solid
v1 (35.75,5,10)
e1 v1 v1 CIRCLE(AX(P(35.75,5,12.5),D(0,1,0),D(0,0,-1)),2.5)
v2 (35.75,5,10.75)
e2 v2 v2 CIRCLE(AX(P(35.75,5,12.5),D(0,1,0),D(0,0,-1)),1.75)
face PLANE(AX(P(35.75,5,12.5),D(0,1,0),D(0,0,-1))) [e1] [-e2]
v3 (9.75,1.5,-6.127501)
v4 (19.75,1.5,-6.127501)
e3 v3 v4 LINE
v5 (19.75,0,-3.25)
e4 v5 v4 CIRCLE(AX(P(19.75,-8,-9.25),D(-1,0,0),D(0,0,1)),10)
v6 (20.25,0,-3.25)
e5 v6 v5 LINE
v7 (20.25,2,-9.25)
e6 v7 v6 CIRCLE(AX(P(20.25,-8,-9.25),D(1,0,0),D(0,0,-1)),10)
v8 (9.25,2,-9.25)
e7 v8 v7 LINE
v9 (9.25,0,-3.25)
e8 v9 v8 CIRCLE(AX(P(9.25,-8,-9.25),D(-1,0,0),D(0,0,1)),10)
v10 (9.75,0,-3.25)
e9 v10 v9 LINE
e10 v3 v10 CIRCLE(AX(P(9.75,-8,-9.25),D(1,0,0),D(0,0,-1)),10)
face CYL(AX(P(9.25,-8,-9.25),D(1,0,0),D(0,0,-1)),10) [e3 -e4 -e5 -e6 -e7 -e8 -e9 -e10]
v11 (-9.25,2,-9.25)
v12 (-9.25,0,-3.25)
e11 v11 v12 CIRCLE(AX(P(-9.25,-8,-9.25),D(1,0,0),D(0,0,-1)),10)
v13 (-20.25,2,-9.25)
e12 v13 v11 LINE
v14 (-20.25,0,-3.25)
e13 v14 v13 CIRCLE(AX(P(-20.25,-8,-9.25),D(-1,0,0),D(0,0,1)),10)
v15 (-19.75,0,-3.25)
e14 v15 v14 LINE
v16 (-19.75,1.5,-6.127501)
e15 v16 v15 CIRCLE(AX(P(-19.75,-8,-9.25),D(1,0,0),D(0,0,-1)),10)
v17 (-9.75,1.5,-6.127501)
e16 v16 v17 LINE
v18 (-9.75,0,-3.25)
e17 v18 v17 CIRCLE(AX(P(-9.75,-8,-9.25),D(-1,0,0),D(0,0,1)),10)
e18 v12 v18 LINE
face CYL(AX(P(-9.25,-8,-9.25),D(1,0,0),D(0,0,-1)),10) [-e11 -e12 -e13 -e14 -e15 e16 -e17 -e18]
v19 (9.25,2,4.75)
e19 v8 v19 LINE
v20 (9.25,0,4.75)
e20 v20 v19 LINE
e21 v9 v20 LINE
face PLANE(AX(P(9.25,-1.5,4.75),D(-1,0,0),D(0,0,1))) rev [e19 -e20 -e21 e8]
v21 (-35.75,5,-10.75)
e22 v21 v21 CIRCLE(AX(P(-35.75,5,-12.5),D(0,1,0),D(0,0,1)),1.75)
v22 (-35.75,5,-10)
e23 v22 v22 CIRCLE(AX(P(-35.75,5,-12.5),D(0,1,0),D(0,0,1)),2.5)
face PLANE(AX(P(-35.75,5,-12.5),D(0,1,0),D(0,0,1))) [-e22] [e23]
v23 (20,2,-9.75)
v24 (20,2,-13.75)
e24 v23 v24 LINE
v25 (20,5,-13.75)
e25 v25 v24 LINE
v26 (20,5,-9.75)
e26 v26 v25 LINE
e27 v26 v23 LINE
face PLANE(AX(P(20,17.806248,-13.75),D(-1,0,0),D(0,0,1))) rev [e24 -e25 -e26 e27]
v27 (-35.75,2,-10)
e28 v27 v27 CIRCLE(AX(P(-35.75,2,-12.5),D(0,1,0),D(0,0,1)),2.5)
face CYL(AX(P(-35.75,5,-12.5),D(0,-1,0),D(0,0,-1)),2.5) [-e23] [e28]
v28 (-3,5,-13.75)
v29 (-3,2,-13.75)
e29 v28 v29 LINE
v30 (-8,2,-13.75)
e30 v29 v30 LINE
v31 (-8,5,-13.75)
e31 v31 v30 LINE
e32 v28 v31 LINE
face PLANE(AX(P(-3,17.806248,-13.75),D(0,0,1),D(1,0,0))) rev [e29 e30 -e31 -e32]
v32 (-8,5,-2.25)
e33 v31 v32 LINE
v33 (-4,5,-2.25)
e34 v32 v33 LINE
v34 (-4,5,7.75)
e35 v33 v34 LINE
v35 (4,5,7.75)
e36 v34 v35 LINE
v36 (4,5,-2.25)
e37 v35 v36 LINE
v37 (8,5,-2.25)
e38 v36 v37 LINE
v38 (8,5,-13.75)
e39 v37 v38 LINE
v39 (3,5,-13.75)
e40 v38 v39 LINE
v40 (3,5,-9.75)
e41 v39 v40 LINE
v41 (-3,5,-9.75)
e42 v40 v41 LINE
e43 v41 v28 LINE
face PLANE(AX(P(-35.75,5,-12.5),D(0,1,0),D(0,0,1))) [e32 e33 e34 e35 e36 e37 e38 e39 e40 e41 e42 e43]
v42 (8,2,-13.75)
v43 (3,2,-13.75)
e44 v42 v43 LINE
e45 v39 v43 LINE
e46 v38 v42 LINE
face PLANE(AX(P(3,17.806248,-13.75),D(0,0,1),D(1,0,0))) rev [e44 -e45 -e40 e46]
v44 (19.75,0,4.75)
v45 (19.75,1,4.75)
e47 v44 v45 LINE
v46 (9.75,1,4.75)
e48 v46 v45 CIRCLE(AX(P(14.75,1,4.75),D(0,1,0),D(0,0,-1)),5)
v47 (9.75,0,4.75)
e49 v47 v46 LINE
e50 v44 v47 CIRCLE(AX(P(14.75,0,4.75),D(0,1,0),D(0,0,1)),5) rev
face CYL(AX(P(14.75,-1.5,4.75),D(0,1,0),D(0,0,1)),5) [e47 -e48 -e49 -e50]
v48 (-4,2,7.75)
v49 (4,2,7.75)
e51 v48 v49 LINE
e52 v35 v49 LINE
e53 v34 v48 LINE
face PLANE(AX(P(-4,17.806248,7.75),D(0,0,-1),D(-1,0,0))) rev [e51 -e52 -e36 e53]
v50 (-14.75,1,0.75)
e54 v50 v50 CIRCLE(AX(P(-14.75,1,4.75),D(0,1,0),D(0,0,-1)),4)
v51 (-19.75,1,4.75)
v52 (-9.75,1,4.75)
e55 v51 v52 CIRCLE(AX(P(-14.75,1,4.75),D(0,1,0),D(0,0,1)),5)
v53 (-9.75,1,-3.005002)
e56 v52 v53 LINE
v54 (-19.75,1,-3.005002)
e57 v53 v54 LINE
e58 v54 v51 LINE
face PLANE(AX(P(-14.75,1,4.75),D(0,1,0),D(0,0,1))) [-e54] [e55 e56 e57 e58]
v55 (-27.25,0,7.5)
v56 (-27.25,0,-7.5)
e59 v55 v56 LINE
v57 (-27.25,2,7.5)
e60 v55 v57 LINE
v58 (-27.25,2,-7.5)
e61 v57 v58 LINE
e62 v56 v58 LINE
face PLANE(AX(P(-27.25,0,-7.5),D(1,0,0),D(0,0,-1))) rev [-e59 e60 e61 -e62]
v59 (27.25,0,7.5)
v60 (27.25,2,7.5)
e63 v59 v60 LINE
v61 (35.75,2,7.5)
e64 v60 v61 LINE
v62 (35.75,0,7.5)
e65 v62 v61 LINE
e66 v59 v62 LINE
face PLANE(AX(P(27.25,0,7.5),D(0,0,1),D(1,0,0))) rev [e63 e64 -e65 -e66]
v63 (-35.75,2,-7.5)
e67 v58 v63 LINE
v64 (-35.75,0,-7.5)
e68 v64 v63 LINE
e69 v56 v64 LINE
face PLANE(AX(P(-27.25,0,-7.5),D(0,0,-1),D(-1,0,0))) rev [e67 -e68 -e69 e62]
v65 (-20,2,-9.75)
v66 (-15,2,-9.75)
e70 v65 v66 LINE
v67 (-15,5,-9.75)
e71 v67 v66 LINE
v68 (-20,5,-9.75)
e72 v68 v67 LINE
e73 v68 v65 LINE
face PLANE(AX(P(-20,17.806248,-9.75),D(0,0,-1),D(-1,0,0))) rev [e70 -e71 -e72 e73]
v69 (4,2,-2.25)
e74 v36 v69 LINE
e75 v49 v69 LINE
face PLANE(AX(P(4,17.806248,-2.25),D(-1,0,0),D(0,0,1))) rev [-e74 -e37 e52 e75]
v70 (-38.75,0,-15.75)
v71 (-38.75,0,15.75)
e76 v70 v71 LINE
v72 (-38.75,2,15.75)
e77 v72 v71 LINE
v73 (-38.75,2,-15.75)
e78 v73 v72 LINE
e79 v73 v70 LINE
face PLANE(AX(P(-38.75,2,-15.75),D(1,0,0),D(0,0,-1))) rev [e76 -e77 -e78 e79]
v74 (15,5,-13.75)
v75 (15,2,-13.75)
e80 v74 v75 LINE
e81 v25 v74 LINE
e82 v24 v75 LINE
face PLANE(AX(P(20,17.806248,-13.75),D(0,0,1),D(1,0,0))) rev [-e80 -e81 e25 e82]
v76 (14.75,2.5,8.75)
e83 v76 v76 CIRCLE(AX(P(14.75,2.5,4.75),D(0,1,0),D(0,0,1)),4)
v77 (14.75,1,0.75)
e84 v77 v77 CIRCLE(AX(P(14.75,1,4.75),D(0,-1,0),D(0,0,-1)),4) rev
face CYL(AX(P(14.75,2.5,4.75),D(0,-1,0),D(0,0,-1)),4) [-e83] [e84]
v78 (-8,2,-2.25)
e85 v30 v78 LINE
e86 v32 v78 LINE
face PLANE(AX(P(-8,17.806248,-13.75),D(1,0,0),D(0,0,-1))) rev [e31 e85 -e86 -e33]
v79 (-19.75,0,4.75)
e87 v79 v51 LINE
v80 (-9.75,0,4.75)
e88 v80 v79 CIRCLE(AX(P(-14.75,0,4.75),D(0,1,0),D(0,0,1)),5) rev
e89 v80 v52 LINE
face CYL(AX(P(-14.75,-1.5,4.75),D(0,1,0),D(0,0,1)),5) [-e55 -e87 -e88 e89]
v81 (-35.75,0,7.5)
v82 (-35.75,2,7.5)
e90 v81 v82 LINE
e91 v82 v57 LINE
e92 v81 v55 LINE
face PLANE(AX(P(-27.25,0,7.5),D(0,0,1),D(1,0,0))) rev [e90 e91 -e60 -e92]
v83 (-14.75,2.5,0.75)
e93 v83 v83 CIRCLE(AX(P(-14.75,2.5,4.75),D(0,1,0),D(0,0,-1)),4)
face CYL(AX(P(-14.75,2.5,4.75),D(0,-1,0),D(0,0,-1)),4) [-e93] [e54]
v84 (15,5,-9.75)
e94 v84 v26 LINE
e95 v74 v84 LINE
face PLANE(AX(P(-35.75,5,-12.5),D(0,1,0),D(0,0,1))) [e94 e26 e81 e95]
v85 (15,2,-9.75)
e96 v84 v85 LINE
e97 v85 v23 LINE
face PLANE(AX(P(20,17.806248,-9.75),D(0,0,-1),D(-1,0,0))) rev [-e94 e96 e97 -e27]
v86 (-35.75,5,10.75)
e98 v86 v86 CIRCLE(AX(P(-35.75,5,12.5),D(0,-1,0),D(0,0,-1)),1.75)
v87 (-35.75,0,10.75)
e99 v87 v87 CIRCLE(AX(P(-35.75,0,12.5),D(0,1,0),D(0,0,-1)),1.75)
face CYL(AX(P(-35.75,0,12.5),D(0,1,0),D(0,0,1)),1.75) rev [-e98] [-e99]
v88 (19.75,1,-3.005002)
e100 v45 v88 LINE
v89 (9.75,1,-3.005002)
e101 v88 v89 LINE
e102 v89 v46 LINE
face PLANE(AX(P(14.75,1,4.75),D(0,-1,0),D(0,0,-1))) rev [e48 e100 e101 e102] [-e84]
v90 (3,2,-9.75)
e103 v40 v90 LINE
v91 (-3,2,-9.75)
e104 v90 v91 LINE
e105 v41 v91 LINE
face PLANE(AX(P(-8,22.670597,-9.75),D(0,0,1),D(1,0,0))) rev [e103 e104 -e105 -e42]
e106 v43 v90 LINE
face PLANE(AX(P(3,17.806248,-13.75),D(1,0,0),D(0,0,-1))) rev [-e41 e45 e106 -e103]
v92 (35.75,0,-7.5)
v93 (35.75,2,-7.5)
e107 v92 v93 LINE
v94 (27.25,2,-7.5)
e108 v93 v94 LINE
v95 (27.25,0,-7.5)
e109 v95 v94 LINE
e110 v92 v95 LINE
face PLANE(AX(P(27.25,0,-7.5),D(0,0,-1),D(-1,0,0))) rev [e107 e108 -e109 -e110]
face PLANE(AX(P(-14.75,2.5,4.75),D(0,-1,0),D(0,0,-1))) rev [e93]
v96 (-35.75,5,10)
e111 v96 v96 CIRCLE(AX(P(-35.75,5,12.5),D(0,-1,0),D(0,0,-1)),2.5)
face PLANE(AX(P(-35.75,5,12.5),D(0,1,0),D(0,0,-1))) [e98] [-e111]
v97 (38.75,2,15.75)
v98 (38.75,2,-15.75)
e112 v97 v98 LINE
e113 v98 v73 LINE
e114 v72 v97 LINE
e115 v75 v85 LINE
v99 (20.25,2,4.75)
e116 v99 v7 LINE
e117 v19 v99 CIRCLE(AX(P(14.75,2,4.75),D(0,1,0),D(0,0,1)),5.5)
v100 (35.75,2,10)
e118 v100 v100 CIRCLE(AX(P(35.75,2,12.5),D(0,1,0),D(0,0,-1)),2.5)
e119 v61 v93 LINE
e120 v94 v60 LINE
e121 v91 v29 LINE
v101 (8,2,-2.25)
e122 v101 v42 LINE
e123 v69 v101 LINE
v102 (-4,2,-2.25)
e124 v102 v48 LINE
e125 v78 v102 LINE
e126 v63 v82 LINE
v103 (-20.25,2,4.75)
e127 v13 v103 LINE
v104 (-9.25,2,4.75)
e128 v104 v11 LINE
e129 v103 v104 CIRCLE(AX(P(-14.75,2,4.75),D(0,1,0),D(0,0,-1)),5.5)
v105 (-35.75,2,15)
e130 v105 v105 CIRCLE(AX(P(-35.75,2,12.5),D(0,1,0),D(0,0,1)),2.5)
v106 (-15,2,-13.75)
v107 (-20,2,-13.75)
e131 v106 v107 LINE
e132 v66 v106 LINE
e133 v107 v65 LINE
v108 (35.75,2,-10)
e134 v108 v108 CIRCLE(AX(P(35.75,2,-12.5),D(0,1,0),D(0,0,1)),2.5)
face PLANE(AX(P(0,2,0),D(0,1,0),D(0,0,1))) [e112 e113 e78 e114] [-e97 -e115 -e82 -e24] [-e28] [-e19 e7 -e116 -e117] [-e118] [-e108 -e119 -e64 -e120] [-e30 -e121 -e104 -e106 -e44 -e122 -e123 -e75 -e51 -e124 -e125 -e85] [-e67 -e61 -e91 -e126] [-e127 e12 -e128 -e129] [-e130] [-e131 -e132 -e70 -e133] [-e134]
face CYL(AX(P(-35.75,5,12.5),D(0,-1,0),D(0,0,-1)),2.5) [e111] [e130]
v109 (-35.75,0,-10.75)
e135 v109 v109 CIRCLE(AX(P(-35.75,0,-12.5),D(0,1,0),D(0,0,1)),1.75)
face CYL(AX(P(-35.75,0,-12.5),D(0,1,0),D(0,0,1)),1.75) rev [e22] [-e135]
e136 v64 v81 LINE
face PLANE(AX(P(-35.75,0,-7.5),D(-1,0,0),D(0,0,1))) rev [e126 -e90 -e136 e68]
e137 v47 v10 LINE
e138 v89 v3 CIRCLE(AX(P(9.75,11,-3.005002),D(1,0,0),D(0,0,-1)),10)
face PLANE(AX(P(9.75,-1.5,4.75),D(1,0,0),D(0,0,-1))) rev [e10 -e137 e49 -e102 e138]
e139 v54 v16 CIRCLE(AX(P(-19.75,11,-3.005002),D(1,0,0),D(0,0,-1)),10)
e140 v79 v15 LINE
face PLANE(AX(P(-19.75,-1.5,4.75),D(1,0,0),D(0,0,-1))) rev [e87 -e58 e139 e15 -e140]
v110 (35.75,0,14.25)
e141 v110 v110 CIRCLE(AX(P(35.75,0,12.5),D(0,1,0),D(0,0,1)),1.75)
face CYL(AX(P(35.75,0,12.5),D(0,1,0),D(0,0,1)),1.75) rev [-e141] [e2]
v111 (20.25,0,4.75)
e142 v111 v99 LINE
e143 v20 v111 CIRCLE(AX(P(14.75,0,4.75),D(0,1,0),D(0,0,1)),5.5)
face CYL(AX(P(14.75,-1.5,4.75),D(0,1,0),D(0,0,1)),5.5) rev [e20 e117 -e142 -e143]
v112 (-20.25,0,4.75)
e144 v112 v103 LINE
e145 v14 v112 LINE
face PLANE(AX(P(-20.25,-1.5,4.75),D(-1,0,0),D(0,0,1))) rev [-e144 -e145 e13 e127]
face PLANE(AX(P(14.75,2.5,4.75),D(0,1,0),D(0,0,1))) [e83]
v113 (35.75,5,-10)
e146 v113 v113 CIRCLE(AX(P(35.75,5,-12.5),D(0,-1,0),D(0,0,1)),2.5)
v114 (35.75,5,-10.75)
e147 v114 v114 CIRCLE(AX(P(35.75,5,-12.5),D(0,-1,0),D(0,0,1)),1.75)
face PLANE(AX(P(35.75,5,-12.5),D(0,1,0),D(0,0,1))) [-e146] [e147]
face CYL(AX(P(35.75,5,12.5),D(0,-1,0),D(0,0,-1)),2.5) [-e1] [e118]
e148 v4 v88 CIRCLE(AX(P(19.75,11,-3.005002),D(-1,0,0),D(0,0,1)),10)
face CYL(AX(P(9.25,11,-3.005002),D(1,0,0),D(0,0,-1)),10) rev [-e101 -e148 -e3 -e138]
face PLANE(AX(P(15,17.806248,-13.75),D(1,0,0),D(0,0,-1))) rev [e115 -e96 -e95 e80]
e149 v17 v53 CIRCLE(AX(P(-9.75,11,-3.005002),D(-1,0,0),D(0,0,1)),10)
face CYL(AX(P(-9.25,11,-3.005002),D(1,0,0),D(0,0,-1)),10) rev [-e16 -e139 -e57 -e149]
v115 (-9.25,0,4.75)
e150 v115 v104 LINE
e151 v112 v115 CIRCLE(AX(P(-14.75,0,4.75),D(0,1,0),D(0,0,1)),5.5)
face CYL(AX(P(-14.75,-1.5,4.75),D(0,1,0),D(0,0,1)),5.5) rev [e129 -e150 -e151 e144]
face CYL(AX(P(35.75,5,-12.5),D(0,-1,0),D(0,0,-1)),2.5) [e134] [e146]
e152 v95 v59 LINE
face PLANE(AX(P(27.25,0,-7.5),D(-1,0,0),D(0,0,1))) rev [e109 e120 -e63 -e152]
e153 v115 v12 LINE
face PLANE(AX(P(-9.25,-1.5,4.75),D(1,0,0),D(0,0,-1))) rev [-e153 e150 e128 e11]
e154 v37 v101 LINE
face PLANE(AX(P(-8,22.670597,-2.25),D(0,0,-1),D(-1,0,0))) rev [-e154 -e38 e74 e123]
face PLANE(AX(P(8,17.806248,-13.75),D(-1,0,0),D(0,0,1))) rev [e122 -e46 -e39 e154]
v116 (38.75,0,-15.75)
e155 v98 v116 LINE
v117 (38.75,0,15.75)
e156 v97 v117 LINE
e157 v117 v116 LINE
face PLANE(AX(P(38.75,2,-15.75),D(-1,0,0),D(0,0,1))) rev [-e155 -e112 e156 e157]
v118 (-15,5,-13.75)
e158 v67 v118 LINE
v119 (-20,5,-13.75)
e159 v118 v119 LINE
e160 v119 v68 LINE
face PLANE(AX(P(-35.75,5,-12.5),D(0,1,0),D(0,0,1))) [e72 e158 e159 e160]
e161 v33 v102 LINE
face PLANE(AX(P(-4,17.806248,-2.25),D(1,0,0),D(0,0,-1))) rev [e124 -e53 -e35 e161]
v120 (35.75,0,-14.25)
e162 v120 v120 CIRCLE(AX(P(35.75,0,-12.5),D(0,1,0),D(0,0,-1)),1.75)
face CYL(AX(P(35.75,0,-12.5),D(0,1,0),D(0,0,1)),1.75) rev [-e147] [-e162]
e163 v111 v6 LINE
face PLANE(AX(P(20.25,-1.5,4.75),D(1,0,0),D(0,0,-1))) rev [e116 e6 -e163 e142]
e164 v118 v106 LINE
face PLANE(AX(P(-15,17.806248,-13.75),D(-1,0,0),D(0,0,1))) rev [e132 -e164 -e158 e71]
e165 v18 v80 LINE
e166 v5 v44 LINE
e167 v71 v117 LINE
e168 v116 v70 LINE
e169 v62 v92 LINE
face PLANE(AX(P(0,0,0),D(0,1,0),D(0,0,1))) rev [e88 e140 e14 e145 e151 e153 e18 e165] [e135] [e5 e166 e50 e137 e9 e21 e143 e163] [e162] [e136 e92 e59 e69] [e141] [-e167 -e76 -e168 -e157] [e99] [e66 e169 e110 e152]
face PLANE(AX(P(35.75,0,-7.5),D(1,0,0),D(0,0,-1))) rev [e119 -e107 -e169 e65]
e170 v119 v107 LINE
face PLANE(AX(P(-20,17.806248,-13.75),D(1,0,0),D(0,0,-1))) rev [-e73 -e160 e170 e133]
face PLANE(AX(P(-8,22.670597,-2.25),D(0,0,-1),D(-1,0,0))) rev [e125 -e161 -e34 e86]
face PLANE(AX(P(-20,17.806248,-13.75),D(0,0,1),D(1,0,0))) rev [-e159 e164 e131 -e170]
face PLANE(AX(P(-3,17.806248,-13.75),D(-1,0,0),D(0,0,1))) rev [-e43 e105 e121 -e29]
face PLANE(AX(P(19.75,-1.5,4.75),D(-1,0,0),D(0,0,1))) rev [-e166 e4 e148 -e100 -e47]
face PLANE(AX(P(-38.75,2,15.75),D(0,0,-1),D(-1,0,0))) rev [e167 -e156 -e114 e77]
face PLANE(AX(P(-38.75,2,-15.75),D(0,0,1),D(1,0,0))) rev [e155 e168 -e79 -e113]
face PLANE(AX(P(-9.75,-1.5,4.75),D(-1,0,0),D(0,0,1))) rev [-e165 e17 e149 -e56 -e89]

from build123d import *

# Parameters (mm, degrees)
SKETCH1_W                 = 77.5
SKETCH1_H                 = 31.5
BOSS_EXTRUDE1_DEPTH       = 2
CUT_EXTRUDE1_DEPTH        = 42.87630595
CUT_EXTRUDE1_DEPTH_BACK   = 42.87630595
SKETCH2_R                 = 1.75
CUT_EXTRUDE2_DEPTH        = 42.87630595
CUT_EXTRUDE2_DEPTH_BACK   = 42.87630595
SKETCH3_W                 = 8.5
SKETCH3_H                 = 15
BOSS_EXTRUDE2_START       = 3
SKETCH4_R                 = 2.5
SKETCH4_R_2               = 1.75
BOSS_EXTRUDE2_DEPTH       = 3
MIRROR2_START             = 3
MIRROR2_COPY_1_SKETCH_R   = 2.5
MIRROR2_COPY_1_SKETCH_R_2 = 1.75
MIRROR2_COPY_1_DEPTH      = 3
CUT_EXTRUDE3_DEPTH        = 3.5
SKETCH6_W                 = 8
SKETCH6_H                 = 10
SKETCH6_W_2               = 5
SKETCH6_H_2               = 4
BOSS_EXTRUDE3_DEPTH       = 3
SKETCH7_W                 = 16
SKETCH7_H                 = 7.5
BOSS_EXTRUDE4_DEPTH       = 3
CUT_EXTRUDE4_DEPTH        = 1
FILLET1_R                 = 10
FILLET2_R                 = 10
SKETCH9_R                 = 4
BOSS_EXTRUDE6_DEPTH       = 1.5


with BuildPart() as part:
    # Sketch1 → Boss-Extrude1 (new body)
    with BuildSketch(Plane(origin=(0, 0, 0), x_dir=(1, 0, 0), z_dir=(0, 1, 0))):
        Rectangle(SKETCH1_W, SKETCH1_H)
    extrude(amount=BOSS_EXTRUDE1_DEPTH)

    # Sketch2 → Cut-Extrude1 (cut, two sides: drawn at the far end of the back side and taken through both)
    with BuildSketch(Plane(origin=(0, 2, 0), x_dir=(1, 0, 0), z_dir=(0, 1, 0)).offset(-CUT_EXTRUDE1_DEPTH_BACK)):
        with Locations(Location((-35.75, 12.5, 0), (0, 0, 270))):
            Circle(SKETCH2_R)
        with Locations(Location((-35.75, -12.5, 0), (0, 0, 270))):
            Circle(SKETCH2_R)
        with Locations(Location((35.75, -12.5, 0), (0, 0, 270))):
            Circle(SKETCH2_R)
        with Locations(Location((35.75, 12.5, 0), (0, 0, 270))):
            Circle(SKETCH2_R)
    extrude(amount=CUT_EXTRUDE1_DEPTH + CUT_EXTRUDE1_DEPTH_BACK, mode=Mode.SUBTRACT)

    # Sketch3 → Cut-Extrude2 (cut, two sides: drawn at the far end of the back side and taken through both)
    with BuildSketch(Plane(origin=(0, 2, 0), x_dir=(1, 0, 0), z_dir=(0, 1, 0)).offset(-CUT_EXTRUDE2_DEPTH_BACK)):
        with Locations((31.5, 0)):
            Rectangle(SKETCH3_W, SKETCH3_H)
        with Locations((-31.5, 0)):
            Rectangle(SKETCH3_W, SKETCH3_H)
    extrude(amount=CUT_EXTRUDE2_DEPTH + CUT_EXTRUDE2_DEPTH_BACK, mode=Mode.SUBTRACT)

    # Sketch4 → Boss-Extrude2 (add)
    with BuildSketch(Plane(origin=(0, 2, 0), x_dir=(1, 0, 0), z_dir=(0, 1, 0)).offset(BOSS_EXTRUDE2_START)):
        with Locations(Location((-35.75, 12.5, 0), (0, 0, 270))):
            Circle(SKETCH4_R)
        with Locations(Location((-35.75, 12.5, 0), (0, 0, 270))):
            Circle(SKETCH4_R_2, mode=Mode.SUBTRACT)
    boss_extrude2 = extrude(amount=-BOSS_EXTRUDE2_DEPTH)

    # Mirror1: Boss-Extrude2 across plane
    add(boss_extrude2.mirror(Plane.XY))

    # Mirror2: Boss-Extrude2 across plane
    add(boss_extrude2.mirror(Plane(origin=(0, 0, 0), x_dir=(0, 0, 1), z_dir=(1, 0, 0))))

    # Mirror2 copy 1 sketch → Mirror2 copy 1 (add)
    with BuildSketch(Plane(origin=(0, 2, 0), x_dir=(-1, 0, 0), z_dir=(0, 1, 0)).offset(MIRROR2_START)):
        with Locations(Location((-35.75, 12.5, 0), (0, 0, 270))):
            Circle(MIRROR2_COPY_1_SKETCH_R)
        with Locations(Location((-35.75, 12.5, 0), (0, 0, 270))):
            Circle(MIRROR2_COPY_1_SKETCH_R_2, mode=Mode.SUBTRACT)
    extrude(amount=-MIRROR2_COPY_1_DEPTH)

    # Sketch5 → Cut-Extrude3 (cut)
    with BuildSketch(Plane(origin=(0, 2, 0), x_dir=(1, 0, 0), z_dir=(0, 1, 0))):
        with BuildLine():
            Line((19.75, -4.75), (19.75, 3.25))
            Line((19.75, 3.25), (20.25, 3.25))
            Line((20.25, 3.25), (20.25, -4.75))
            ThreePointArc((20.25, -4.75), (14.75, -10.25), (9.25, -4.75))
            Line((9.25, -4.75), (9.25, 3.25))
            Line((9.25, 3.25), (9.75, 3.25))
            Line((9.75, 3.25), (9.75, -4.75))
            ThreePointArc((9.75, -4.75), (14.75, -9.75), (19.75, -4.75))
        make_face()
        with BuildLine():
            Line((-19.75, 3.25), (-20.25, 3.25))
            Line((-20.25, 3.25), (-20.25, -4.75))
            ThreePointArc((-20.25, -4.75), (-14.75, -10.25), (-9.25, -4.75))
            Line((-9.25, -4.75), (-9.25, 3.25))
            Line((-9.25, 3.25), (-9.75, 3.25))
            Line((-9.75, 3.25), (-9.75, -4.75))
            ThreePointArc((-9.75, -4.75), (-14.75, -9.75), (-19.75, -4.75))
            Line((-19.75, -4.75), (-19.75, 3.25))
        make_face()
    extrude(amount=-CUT_EXTRUDE3_DEPTH, mode=Mode.SUBTRACT)

    # Sketch6 → Boss-Extrude3 (add)
    with BuildSketch(Plane(origin=(0, 2, 0), x_dir=(1, 0, 0), z_dir=(0, 1, 0))):
        with Locations((0, -2.75)):
            Rectangle(SKETCH6_W, SKETCH6_H)
        with Locations((5.5, 11.75)):
            Rectangle(SKETCH6_W_2, SKETCH6_H_2)
        with Locations((17.5, 11.75)):
            Rectangle(SKETCH6_W_2, SKETCH6_H_2)
        with Locations((-17.5, 11.75)):
            Rectangle(SKETCH6_W_2, SKETCH6_H_2)
        with Locations((-5.5, 11.75)):
            Rectangle(SKETCH6_W_2, SKETCH6_H_2)
    extrude(amount=BOSS_EXTRUDE3_DEPTH)

    # Sketch7 → Boss-Extrude4 (add)
    with BuildSketch(Plane(origin=(0, 2, 0), x_dir=(1, 0, 0), z_dir=(0, 1, 0))):
        with Locations((0, 6)):
            Rectangle(SKETCH7_W, SKETCH7_H)
    extrude(amount=BOSS_EXTRUDE4_DEPTH)

    # Sketch8 → Cut-Extrude4 (cut)
    with BuildSketch(Plane(origin=(0, 2, 0), x_dir=(1, 0, 0), z_dir=(0, 1, 0))):
        with BuildLine():
            Line((-9.75, 3.25), (-9.75, -4.75))
            ThreePointArc((-9.75, -4.75), (-14.75, -9.75), (-19.75, -4.75))
            Line((-19.75, -4.75), (-19.75, 3.25))
            Line((-19.75, 3.25), (-9.75, 3.25))
        make_face()
        with BuildLine():
            Line((19.75, 3.25), (9.75, 3.25))
            Line((9.75, 3.25), (9.75, -4.75))
            ThreePointArc((9.75, -4.75), (14.75, -9.75), (19.75, -4.75))
            Line((19.75, -4.75), (19.75, 3.25))
        make_face()
    extrude(amount=-CUT_EXTRUDE4_DEPTH, mode=Mode.SUBTRACT)

    # Fillet1
    # the kernel refuses this fillet: 10 mm, written as the material it takes off along each edge
    with BuildSketch(Plane(origin=(-4.75, 2, -3.25), x_dir=(0, 0, -1), z_dir=(-1, 0, 0))) as fillet1_piece_1_section:
        with BuildLine():
            CenterArc((6, 10), FILLET1_R, 233.130102354, 36.869897646)
            Line((0, 2), (0, 0))
            Line((0, 0), (6, 0))
        make_face()
    fillet1_piece_1 = extrude(amount=15.5, mode=Mode.PRIVATE)
    fillet1_piece_1 = split(fillet1_piece_1, bisect_by=Plane(origin=(-9.25, 2, -3.25), z_dir=(-1, 0, 0)), keep=Keep.TOP, mode=Mode.PRIVATE)
    fillet1_piece_1 = split(fillet1_piece_1, bisect_by=Plane(origin=(-4.75, 1, -3.25), z_dir=(0, 1, 0)), keep=Keep.TOP, mode=Mode.PRIVATE)
    add(fillet1_piece_1, mode=Mode.SUBTRACT)
    with BuildSketch(Plane(origin=(-4.75, 2, -3.25), x_dir=(0, 0, -1), z_dir=(-1, 0, 0))) as fillet1_piece_2_section:
        with BuildLine():
            CenterArc((6, 10), FILLET1_R, 233.130102354, 36.869897646)
            Line((0, 2), (0, 0))
            Line((0, 0), (6, 0))
        make_face()
    fillet1_piece_2 = extrude(amount=30.5, mode=Mode.PRIVATE)
    fillet1_piece_2 = split(fillet1_piece_2, bisect_by=Plane(origin=(-9.25, 2, -3.25), z_dir=(-1, 0, 0)), keep=Keep.TOP, mode=Mode.PRIVATE)
    fillet1_piece_2 = split(fillet1_piece_2, bisect_by=Plane(origin=(-9.75, 2, -3.25), z_dir=(1, 0, 0)), keep=Keep.TOP, mode=Mode.PRIVATE)
    add(fillet1_piece_2, mode=Mode.SUBTRACT)
    with BuildSketch(Plane(origin=(-19.75, 2, -3.25), x_dir=(0, 0, -1), z_dir=(-1, 0, 0)), Plane(origin=(-9.25, 2, -3.25), x_dir=(0, 0, -1), z_dir=(-1, 0, 0))) as fillet1_piece_3:
        with BuildLine():
            CenterArc((6, 10), FILLET1_R, 233.130102354, 36.869897646)
            Line((0, 2), (0, 0))
            Line((0, 0), (6, 0))
        make_face()
    extrude(amount=0.5, mode=Mode.SUBTRACT)
    with BuildSketch(Plane(origin=(-9.25, 2, -3.25), x_dir=(0, 0, -1), z_dir=(-1, 0, 0))) as fillet1_piece_4_section:
        with BuildLine():
            CenterArc((6, 10), FILLET1_R, 233.130102354, 36.869897646)
            Line((0, 2), (0, 0))
            Line((0, 0), (6, 0))
        make_face()
    fillet1_piece_4 = extrude(amount=15.5, mode=Mode.PRIVATE)
    fillet1_piece_4 = split(fillet1_piece_4, bisect_by=Plane(origin=(-20.25, 2, -3.25), z_dir=(1, 0, 0)), keep=Keep.TOP, mode=Mode.PRIVATE)
    fillet1_piece_4 = split(fillet1_piece_4, bisect_by=Plane(origin=(-9.25, 1, -3.25), z_dir=(0, 1, 0)), keep=Keep.TOP, mode=Mode.PRIVATE)
    add(fillet1_piece_4, mode=Mode.SUBTRACT)
    with BuildSketch(Plane(origin=(5.75, 2, -3.25), x_dir=(0, 0, -1), z_dir=(-1, 0, 0))) as fillet1_piece_5_section:
        with BuildLine():
            CenterArc((6, 10), FILLET1_R, 233.130102354, 36.869897646)
            Line((0, 2), (0, 0))
            Line((0, 0), (6, 0))
        make_face()
    fillet1_piece_5 = extrude(amount=30.5, mode=Mode.PRIVATE)
    fillet1_piece_5 = split(fillet1_piece_5, bisect_by=Plane(origin=(-20.25, 2, -3.25), z_dir=(1, 0, 0)), keep=Keep.TOP, mode=Mode.PRIVATE)
    fillet1_piece_5 = split(fillet1_piece_5, bisect_by=Plane(origin=(-19.75, 2, -3.25), z_dir=(-1, 0, 0)), keep=Keep.TOP, mode=Mode.PRIVATE)
    add(fillet1_piece_5, mode=Mode.SUBTRACT)
    with BuildSketch(Plane(origin=(4.75, 2, -3.25), x_dir=(0, 0, -1), z_dir=(1, 0, 0))) as fillet1_piece_6_section:
        with BuildLine():
            CenterArc((6, -10), FILLET1_R, 90, 36.869897646)
            Line((0, -2), (0, 0))
            Line((0, 0), (6, 0))
        make_face()
    fillet1_piece_6 = extrude(amount=15.5, mode=Mode.PRIVATE)
    fillet1_piece_6 = split(fillet1_piece_6, bisect_by=Plane(origin=(9.25, 2, -3.25), z_dir=(1, 0, 0)), keep=Keep.TOP, mode=Mode.PRIVATE)
    fillet1_piece_6 = split(fillet1_piece_6, bisect_by=Plane(origin=(4.75, 1, -3.25), z_dir=(0, 1, 0)), keep=Keep.TOP, mode=Mode.PRIVATE)
    add(fillet1_piece_6, mode=Mode.SUBTRACT)
    with BuildSketch(Plane(origin=(4.75, 2, -3.25), x_dir=(0, 0, -1), z_dir=(1, 0, 0))) as fillet1_piece_7_section:
        with BuildLine():
            CenterArc((6, -10), FILLET1_R, 90, 36.869897646)
            Line((0, -2), (0, 0))
            Line((0, 0), (6, 0))
        make_face()
    fillet1_piece_7 = extrude(amount=30.5, mode=Mode.PRIVATE)
    fillet1_piece_7 = split(fillet1_piece_7, bisect_by=Plane(origin=(9.75, 2, -3.25), z_dir=(-1, 0, 0)), keep=Keep.TOP, mode=Mode.PRIVATE)
    fillet1_piece_7 = split(fillet1_piece_7, bisect_by=Plane(origin=(9.25, 2, -3.25), z_dir=(1, 0, 0)), keep=Keep.TOP, mode=Mode.PRIVATE)
    add(fillet1_piece_7, mode=Mode.SUBTRACT)
    with BuildSketch(Plane(origin=(19.75, 2, -3.25), x_dir=(0, 0, -1), z_dir=(1, 0, 0)), Plane(origin=(9.25, 2, -3.25), x_dir=(0, 0, -1), z_dir=(1, 0, 0))) as fillet1_piece_8:
        with BuildLine():
            CenterArc((6, -10), FILLET1_R, 90, 36.869897646)
            Line((0, -2), (0, 0))
            Line((0, 0), (6, 0))
        make_face()
    extrude(amount=0.5, mode=Mode.SUBTRACT)
    with BuildSketch(Plane(origin=(9.25, 2, -3.25), x_dir=(0, 0, -1), z_dir=(1, 0, 0))) as fillet1_piece_9_section:
        with BuildLine():
            CenterArc((6, -10), FILLET1_R, 90, 36.869897646)
            Line((0, -2), (0, 0))
            Line((0, 0), (6, 0))
        make_face()
    fillet1_piece_9 = extrude(amount=15.5, mode=Mode.PRIVATE)
    fillet1_piece_9 = split(fillet1_piece_9, bisect_by=Plane(origin=(20.25, 2, -3.25), z_dir=(-1, 0, 0)), keep=Keep.TOP, mode=Mode.PRIVATE)
    fillet1_piece_9 = split(fillet1_piece_9, bisect_by=Plane(origin=(9.25, 1, -3.25), z_dir=(0, 1, 0)), keep=Keep.TOP, mode=Mode.PRIVATE)
    add(fillet1_piece_9, mode=Mode.SUBTRACT)
    with BuildSketch(Plane(origin=(-5.75, 2, -3.25), x_dir=(0, 0, -1), z_dir=(1, 0, 0))) as fillet1_piece_10_section:
        with BuildLine():
            CenterArc((6, -10), FILLET1_R, 90, 36.869897646)
            Line((0, -2), (0, 0))
            Line((0, 0), (6, 0))
        make_face()
    fillet1_piece_10 = extrude(amount=30.5, mode=Mode.PRIVATE)
    fillet1_piece_10 = split(fillet1_piece_10, bisect_by=Plane(origin=(19.75, 2, -3.25), z_dir=(1, 0, 0)), keep=Keep.TOP, mode=Mode.PRIVATE)
    fillet1_piece_10 = split(fillet1_piece_10, bisect_by=Plane(origin=(20.25, 2, -3.25), z_dir=(-1, 0, 0)), keep=Keep.TOP, mode=Mode.PRIVATE)
    add(fillet1_piece_10, mode=Mode.SUBTRACT)

    # Fillet2
    # the kernel refuses this fillet: 10 mm, written as the material it adds along each edge
    with BuildSketch(Plane(origin=(19.75, 1, -4.891101056), x_dir=(0, 0.3749043717325089, -0.9270634886866448), z_dir=(-1, 0, 0))) as fillet2_piece_1:
        with BuildLine():
            CenterArc((2.000510148, -9.977741668), FILLET2_R, 93.823530212, 18.194872339)
            Line((-1.74853357, -0.707106781), (0, 0))
            ThreePointArc((0, 0), (0.666836716, -0.022258332), (1.333673432, 0))
        make_face()
    extrude(amount=10)
    with BuildSketch(Plane(origin=(-19.75, 1, -4.891101056), x_dir=(0, 0.3749043717325089, -0.9270634886866448), z_dir=(1, 0, 0))) as fillet2_piece_2:
        with BuildLine():
            CenterArc((2.000510148, 9.977741668), FILLET2_R, 247.981597449, 18.194872339)
            Line((-1.74853357, 0.707106781), (0, 0))
            ThreePointArc((0, 0), (0.666836716, 0.022258332), (1.333673432, 0))
        make_face()
    extrude(amount=10)

    # Sketch9 → Boss-Extrude6 (add)
    with BuildSketch(Plane(origin=(0, 1, 0), x_dir=(1, 0, 0), z_dir=(0, 1, 0))):
        with Locations(Location((14.75, -4.75, 0), (0, 0, 90))):
            Circle(SKETCH9_R)
        with Locations(Location((-14.75, -4.75, 0), (0, 0, 90))):
            Circle(SKETCH9_R)
    extrude(amount=BOSS_EXTRUDE6_DEPTH)


solid = part.part
